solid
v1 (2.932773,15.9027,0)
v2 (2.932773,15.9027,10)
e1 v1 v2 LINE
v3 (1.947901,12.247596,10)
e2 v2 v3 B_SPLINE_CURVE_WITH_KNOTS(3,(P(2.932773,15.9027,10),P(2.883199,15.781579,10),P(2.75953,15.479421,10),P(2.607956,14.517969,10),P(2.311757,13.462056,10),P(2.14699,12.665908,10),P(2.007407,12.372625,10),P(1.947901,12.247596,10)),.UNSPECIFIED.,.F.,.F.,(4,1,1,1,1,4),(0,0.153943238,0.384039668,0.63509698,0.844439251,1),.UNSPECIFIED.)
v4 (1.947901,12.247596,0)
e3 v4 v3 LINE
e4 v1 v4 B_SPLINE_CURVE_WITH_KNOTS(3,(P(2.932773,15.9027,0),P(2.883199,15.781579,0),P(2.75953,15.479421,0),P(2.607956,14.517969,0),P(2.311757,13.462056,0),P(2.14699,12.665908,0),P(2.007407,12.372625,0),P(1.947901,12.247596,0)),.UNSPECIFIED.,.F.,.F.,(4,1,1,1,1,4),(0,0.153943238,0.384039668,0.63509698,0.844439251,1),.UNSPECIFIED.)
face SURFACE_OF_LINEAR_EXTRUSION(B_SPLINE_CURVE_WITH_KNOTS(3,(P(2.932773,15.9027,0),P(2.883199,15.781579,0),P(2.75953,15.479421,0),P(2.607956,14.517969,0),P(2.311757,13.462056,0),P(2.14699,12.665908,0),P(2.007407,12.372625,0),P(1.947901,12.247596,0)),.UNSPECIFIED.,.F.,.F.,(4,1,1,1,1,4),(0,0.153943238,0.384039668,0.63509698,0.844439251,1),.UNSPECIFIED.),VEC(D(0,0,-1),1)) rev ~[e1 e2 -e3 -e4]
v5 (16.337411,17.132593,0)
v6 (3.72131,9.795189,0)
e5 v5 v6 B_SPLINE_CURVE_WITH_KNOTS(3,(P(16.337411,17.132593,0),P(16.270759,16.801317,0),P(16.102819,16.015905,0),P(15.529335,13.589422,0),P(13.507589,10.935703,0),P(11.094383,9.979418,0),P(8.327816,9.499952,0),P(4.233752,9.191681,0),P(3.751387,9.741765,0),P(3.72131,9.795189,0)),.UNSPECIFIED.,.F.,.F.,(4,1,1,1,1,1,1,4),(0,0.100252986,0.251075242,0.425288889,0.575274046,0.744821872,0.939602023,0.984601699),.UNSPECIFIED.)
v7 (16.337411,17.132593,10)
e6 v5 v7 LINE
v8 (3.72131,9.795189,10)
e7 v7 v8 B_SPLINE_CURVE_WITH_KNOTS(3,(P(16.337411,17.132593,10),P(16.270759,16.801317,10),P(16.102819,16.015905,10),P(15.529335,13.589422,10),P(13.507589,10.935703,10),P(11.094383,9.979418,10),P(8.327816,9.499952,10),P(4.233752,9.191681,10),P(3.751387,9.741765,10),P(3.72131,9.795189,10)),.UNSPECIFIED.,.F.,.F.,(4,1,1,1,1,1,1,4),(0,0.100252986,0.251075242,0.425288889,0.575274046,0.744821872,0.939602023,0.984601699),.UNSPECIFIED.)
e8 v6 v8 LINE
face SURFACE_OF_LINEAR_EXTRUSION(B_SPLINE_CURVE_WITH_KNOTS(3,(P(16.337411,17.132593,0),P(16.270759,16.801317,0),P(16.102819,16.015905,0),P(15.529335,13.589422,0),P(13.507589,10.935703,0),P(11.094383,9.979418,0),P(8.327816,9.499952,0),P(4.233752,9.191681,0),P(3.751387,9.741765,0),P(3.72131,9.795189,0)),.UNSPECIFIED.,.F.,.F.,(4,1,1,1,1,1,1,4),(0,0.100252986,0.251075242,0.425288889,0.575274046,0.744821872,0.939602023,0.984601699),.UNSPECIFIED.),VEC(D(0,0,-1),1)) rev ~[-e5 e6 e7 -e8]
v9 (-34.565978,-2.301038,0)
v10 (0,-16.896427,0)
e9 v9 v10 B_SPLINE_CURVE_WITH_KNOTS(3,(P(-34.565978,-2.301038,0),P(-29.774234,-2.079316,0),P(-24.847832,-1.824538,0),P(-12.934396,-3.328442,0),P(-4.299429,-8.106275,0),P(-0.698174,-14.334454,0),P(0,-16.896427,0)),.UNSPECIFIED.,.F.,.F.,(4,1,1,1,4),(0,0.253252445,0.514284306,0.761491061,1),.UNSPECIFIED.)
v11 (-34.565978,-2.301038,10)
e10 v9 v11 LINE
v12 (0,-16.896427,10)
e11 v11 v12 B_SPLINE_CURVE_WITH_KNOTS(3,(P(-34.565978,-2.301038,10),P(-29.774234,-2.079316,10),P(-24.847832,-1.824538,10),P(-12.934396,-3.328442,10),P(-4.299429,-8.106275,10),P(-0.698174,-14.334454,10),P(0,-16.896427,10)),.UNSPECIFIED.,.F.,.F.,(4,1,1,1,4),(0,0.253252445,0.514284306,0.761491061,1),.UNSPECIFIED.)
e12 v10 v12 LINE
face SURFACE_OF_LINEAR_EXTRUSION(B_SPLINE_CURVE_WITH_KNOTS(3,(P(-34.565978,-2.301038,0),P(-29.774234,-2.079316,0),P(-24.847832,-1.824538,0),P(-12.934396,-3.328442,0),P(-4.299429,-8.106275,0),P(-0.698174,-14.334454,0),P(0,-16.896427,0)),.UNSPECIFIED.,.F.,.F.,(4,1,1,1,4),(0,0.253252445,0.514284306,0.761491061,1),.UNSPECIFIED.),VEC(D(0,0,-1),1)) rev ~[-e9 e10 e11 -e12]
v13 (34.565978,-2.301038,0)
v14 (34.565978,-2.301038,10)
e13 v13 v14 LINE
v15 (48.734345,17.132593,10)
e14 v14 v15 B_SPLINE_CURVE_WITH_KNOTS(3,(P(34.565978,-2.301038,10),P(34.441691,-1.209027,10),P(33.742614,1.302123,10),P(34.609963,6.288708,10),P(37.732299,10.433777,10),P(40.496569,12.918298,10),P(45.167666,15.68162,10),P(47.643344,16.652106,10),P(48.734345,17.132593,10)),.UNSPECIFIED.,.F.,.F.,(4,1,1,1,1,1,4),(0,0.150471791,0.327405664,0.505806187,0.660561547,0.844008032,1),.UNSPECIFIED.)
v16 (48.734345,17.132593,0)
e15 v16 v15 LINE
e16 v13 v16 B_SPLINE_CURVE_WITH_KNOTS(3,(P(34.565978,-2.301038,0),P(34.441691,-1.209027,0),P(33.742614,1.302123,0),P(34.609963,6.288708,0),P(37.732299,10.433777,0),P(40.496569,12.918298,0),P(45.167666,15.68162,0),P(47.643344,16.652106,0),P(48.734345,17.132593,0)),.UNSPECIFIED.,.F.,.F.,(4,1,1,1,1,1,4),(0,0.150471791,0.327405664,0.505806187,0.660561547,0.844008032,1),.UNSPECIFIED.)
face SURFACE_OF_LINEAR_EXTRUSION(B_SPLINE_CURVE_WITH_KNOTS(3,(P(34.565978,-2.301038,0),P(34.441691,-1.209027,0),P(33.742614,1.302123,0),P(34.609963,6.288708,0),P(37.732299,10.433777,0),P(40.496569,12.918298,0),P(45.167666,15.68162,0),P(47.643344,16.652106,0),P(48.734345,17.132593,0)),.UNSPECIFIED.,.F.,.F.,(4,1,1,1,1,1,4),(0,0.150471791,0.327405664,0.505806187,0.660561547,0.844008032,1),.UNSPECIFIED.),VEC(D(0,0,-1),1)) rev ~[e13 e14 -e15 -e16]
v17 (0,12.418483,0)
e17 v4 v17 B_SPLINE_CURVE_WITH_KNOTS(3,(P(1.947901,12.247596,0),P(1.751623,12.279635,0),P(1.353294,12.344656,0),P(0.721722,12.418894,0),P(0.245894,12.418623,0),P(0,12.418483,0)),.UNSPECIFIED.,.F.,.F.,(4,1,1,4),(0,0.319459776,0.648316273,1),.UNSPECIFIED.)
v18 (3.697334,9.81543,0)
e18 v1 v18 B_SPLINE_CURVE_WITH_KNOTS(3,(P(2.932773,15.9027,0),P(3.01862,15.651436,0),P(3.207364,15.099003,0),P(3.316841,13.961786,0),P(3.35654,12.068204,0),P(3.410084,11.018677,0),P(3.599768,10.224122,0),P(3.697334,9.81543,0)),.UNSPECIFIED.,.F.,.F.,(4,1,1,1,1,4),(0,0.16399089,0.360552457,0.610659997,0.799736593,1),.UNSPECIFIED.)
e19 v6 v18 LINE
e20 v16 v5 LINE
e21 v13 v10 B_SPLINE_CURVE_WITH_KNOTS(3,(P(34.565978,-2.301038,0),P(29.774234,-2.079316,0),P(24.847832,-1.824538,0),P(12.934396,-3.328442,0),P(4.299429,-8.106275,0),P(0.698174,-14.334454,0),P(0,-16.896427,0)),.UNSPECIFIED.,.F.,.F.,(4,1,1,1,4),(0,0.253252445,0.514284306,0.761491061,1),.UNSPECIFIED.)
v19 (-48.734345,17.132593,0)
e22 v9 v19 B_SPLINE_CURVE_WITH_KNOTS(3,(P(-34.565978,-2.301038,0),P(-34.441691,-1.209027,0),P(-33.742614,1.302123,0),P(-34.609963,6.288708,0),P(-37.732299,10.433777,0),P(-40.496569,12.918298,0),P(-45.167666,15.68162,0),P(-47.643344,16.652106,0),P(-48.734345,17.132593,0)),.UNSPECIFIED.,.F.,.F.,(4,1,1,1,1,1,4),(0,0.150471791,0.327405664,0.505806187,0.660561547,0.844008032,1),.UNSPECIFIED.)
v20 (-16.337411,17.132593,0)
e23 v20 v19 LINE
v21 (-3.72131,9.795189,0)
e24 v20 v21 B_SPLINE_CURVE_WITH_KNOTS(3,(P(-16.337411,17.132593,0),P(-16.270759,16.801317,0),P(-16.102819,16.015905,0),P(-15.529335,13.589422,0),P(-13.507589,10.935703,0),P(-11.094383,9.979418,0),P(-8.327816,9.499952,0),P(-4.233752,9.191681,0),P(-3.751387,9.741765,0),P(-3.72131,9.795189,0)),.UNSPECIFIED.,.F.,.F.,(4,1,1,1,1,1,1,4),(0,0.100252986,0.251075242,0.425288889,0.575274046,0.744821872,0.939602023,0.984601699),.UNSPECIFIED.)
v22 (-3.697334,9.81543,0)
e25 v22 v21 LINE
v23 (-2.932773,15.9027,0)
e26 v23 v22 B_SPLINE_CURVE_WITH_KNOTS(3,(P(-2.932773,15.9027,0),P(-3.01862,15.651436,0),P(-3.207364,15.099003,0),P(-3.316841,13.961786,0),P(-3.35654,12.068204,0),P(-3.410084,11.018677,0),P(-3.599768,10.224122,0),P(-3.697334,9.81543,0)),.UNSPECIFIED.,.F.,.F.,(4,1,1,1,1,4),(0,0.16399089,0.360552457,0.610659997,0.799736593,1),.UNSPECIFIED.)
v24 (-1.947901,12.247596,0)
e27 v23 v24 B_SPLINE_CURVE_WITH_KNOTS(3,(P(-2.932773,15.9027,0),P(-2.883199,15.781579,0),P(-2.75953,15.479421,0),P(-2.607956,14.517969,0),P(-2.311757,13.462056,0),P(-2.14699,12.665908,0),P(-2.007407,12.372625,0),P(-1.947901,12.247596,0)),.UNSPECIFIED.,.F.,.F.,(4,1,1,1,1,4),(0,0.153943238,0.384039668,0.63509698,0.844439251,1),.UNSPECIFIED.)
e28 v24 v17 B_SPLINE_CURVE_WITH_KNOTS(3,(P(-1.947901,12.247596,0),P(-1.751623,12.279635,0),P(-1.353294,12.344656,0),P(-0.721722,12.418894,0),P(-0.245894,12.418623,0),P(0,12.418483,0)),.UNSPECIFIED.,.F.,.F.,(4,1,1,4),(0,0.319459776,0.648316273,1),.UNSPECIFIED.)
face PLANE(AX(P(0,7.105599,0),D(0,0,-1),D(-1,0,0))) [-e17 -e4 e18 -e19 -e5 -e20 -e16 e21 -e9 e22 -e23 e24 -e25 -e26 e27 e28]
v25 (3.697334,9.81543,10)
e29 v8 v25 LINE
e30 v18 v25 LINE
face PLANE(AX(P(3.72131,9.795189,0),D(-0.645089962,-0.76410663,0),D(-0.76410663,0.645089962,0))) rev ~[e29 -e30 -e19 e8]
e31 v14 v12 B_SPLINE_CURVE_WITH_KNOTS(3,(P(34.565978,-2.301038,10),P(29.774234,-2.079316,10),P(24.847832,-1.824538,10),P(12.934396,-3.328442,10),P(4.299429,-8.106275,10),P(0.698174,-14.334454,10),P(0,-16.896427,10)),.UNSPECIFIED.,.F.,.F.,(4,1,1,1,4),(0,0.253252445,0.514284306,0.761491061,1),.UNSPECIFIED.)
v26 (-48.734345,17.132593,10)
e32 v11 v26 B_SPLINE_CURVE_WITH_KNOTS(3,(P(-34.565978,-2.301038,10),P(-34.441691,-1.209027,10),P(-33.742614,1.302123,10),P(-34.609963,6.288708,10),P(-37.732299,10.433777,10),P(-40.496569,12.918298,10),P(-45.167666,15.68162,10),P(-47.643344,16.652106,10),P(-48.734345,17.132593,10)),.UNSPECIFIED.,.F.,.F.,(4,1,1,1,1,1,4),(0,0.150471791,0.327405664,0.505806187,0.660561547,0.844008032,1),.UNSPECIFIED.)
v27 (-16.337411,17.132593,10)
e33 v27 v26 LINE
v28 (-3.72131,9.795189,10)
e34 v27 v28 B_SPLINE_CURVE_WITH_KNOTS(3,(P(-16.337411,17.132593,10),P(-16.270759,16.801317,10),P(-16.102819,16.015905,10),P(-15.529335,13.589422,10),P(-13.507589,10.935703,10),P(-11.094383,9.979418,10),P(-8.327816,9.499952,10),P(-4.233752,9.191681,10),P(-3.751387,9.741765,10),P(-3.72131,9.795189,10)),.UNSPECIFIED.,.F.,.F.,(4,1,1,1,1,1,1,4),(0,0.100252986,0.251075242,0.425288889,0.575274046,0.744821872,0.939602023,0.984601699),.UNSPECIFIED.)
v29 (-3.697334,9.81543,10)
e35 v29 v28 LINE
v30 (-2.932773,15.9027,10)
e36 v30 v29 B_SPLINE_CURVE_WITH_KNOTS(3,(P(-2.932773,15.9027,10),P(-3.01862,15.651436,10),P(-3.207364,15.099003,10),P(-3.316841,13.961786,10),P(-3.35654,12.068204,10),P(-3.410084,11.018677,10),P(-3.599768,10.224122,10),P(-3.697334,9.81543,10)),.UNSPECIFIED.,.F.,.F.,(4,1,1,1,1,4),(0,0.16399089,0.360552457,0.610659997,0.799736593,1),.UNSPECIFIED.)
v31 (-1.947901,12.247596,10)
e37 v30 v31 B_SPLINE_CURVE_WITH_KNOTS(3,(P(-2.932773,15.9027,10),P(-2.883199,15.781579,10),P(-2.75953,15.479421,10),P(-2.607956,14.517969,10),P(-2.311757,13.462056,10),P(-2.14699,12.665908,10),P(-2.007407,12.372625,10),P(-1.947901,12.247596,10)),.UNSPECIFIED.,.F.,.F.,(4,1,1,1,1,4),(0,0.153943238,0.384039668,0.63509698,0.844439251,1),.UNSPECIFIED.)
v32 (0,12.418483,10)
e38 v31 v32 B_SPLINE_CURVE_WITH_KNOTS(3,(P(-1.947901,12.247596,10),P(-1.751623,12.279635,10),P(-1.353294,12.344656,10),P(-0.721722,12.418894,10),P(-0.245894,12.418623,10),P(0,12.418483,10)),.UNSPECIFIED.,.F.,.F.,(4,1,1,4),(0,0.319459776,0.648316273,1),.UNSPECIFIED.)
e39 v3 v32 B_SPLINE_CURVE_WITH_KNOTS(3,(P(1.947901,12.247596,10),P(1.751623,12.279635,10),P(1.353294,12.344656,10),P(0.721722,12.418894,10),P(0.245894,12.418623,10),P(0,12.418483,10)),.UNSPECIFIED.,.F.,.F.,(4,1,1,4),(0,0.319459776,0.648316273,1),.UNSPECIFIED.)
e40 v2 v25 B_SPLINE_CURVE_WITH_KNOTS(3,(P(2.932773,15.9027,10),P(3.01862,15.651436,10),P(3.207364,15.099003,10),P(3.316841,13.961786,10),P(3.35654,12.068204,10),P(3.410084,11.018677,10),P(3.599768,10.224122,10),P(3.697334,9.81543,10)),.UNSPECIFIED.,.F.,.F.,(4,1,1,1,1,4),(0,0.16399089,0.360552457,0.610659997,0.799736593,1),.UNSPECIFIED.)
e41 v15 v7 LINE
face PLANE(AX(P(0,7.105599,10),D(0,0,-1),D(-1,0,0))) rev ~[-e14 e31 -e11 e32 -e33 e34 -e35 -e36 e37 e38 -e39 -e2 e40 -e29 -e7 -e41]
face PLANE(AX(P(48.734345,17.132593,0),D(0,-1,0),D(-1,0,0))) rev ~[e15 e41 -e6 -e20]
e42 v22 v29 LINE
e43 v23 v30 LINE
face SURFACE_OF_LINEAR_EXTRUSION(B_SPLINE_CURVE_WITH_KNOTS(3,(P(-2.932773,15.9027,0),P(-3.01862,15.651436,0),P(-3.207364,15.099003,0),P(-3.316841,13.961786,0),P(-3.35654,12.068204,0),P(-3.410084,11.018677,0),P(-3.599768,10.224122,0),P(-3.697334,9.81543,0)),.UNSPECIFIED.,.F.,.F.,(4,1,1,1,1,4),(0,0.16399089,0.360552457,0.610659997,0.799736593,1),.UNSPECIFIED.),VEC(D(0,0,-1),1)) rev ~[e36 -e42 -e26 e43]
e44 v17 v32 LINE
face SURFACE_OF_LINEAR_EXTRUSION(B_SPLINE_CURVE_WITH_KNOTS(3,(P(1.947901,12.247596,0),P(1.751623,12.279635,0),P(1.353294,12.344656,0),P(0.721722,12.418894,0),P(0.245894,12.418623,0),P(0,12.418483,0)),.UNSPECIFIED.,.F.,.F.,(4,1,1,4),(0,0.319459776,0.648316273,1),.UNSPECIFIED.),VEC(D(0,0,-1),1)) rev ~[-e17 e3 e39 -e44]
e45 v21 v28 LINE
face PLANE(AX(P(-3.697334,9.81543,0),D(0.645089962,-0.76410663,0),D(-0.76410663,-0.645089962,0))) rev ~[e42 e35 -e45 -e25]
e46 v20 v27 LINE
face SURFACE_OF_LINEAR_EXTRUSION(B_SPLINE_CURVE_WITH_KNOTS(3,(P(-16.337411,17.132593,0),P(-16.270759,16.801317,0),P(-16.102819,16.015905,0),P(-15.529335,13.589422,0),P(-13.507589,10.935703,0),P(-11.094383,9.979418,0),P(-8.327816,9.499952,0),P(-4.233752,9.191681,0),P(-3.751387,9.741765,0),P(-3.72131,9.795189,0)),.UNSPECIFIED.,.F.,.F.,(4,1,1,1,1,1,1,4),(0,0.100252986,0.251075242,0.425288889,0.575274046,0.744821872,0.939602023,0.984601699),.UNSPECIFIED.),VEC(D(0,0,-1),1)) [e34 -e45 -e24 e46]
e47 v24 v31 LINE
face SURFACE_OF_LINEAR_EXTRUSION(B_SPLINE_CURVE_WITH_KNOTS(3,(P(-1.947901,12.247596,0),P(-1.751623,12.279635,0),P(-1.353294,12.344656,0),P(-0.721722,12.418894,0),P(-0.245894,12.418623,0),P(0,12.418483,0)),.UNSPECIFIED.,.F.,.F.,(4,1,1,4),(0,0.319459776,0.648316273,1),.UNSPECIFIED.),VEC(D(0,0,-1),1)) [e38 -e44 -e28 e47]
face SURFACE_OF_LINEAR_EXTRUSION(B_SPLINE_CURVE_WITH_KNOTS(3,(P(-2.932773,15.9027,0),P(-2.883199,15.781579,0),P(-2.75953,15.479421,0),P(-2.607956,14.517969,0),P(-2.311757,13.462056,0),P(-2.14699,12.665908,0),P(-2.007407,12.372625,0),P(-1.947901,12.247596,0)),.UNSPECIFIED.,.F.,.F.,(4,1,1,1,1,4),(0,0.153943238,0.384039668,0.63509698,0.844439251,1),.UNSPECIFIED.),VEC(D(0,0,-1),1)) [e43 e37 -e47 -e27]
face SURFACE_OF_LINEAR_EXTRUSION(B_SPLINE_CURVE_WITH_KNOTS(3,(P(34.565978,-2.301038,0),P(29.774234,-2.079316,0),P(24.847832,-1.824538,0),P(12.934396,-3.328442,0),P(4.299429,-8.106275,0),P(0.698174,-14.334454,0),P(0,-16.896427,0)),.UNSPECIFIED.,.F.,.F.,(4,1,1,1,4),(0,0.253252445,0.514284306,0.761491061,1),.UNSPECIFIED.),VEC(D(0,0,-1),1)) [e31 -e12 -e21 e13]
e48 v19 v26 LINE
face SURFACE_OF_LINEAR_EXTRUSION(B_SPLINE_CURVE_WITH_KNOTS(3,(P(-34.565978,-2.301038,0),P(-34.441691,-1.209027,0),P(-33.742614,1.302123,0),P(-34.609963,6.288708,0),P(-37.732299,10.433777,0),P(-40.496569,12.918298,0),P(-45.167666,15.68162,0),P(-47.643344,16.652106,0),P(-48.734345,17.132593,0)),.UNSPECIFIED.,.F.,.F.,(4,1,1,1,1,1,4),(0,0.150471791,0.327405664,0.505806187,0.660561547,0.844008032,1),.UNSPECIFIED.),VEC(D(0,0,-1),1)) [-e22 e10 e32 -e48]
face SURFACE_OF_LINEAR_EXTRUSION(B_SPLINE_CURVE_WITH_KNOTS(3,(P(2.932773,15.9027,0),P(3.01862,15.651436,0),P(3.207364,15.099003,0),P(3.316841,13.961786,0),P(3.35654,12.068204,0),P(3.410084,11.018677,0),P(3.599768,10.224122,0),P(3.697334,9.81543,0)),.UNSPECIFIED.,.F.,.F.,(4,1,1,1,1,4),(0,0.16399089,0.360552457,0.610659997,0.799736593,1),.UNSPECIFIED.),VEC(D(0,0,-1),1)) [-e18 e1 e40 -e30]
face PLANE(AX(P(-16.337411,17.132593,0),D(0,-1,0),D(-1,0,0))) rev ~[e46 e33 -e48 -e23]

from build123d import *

# Parameters (mm, degrees)
F1_DEPTH = 10


with BuildPart() as f1:
    # F0 (on Top) → F1 (new body)
    with BuildSketch(Plane.XY):
        with BuildLine():
            add(Edge.make_bspline(
                [(-34.5659777522, -2.3010377772), (-34.441690892, -1.2090269011), (-33.7426143908, 1.3021229087), (-34.6099625003, 6.2887083902), (-37.732299485, 10.4337765544), (-40.4965689238, 12.9182984992), (-45.1676660532, 15.6816198367), (-47.6433440327, 16.6521064837), (-48.734344542, 17.1325933188)],
                knots=[0, 0, 0, 0, 0.1504717907, 0.3274056637, 0.505806187, 0.6605615473, 0.844008032, 1, 1, 1, 1], degree=3))
            add(Edge.make_bspline(
                [(-34.5659777522, -2.3010377772), (-29.7742336988, -2.0793164149), (-24.8478324902, -1.8245382393), (-12.9343956026, -3.3284422394), (-4.2994288291, -8.106275212), (-0.6981744502, -14.3344540986), (0, -16.8964266777)],
                knots=[0, 0, 0, 0, 0.2532524451, 0.514284306, 0.7614910609, 1, 1, 1, 1], degree=3))
            add(Edge.make_bspline(
                [(34.5659777522, -2.3010377772), (29.7742336988, -2.0793164149), (24.8478324902, -1.8245382393), (12.9343956026, -3.3284422394), (4.2994288291, -8.106275212), (0.6981744502, -14.3344540986), (0, -16.8964266777)],
                knots=[0, 0, 0, 0, 0.2532524451, 0.514284306, 0.7614910609, 1, 1, 1, 1], degree=3))
            add(Edge.make_bspline(
                [(34.5659777522, -2.3010377772), (34.441690892, -1.2090269011), (33.7426143908, 1.3021229087), (34.6099625003, 6.2887083902), (37.732299485, 10.4337765544), (40.4965689238, 12.9182984992), (45.1676660532, 15.6816198367), (47.6433440327, 16.6521064837), (48.734344542, 17.1325933188)],
                knots=[0, 0, 0, 0, 0.1504717907, 0.3274056637, 0.505806187, 0.6605615473, 0.844008032, 1, 1, 1, 1], degree=3))
            Line((48.734344542, 17.1325933188), (16.3374114782, 17.1325933188))
            add(Edge.make_bspline(
                [(16.3374114782, 17.1325933188), (16.2707590578, 16.8013167715), (16.1028193617, 16.0159047713), (15.5293351039, 13.5894216644), (13.5075885145, 10.9357028955), (11.0943832685, 9.979418199), (8.3278162532, 9.4999515323), (4.2337515187, 9.1916813282), (3.7513867907, 9.7417653506), (3.721309654, 9.7951889602)],
                knots=[0, 0, 0, 0, 0.1002529863, 0.2510752424, 0.4252888894, 0.575274046, 0.7448218724, 0.9396020225, 0.9846016995, 0.9846016995, 0.9846016995, 0.9846016995], degree=3))
            Line((3.721309654, 9.7951889602), (3.6973344953, 9.8154297664))
            add(Edge.make_bspline(
                [(2.932772506, 15.9026999027), (3.018619719, 15.6514358008), (3.2073644933, 15.0990033508), (3.3168408961, 13.9617858734), (3.3565401619, 12.068204215), (3.4100837285, 11.0186767215), (3.599767527, 10.2241220004), (3.6973344953, 9.8154297664)],
                knots=[0, 0, 0, 0, 0.16399089, 0.3605524565, 0.6106599974, 0.7997365931, 1, 1, 1, 1], degree=3))
            add(Edge.make_bspline(
                [(2.932772506, 15.9026999027), (2.8831992541, 15.7815790305), (2.7595296769, 15.4794207803), (2.6079557623, 14.5179694226), (2.311756701, 13.4620564486), (2.1469901884, 12.6659080553), (2.0074066607, 12.3726247092), (1.9479012117, 12.2475959361)],
                knots=[0, 0, 0, 0, 0.1539432383, 0.3840396681, 0.6350969803, 0.8444392514, 1, 1, 1, 1], degree=3))
            add(Edge.make_bspline(
                [(1.9479012117, 12.2475959361), (1.7516233528, 12.2796352379), (1.3532942381, 12.3446562585), (0.7217223004, 12.418893829), (0.2458943028, 12.4186232246), (0, 12.418483384)],
                knots=[0, 0, 0, 0, 0.3194597762, 0.6483162725, 1, 1, 1, 1], degree=3))
            add(Edge.make_bspline(
                [(-1.9479012117, 12.2475959361), (-1.7516233528, 12.2796352379), (-1.3532942381, 12.3446562585), (-0.7217223004, 12.418893829), (-0.2458943028, 12.4186232246), (0, 12.418483384)],
                knots=[0, 0, 0, 0, 0.3194597762, 0.6483162725, 1, 1, 1, 1], degree=3))
            add(Edge.make_bspline(
                [(-2.932772506, 15.9026999027), (-2.8831992541, 15.7815790305), (-2.7595296769, 15.4794207803), (-2.6079557623, 14.5179694226), (-2.311756701, 13.4620564486), (-2.1469901884, 12.6659080553), (-2.0074066607, 12.3726247092), (-1.9479012117, 12.2475959361)],
                knots=[0, 0, 0, 0, 0.1539432383, 0.3840396681, 0.6350969803, 0.8444392514, 1, 1, 1, 1], degree=3))
            add(Edge.make_bspline(
                [(-2.932772506, 15.9026999027), (-3.018619719, 15.6514358008), (-3.2073644933, 15.0990033508), (-3.3168408961, 13.9617858734), (-3.3565401619, 12.068204215), (-3.4100837285, 11.0186767215), (-3.599767527, 10.2241220004), (-3.6973344953, 9.8154297664)],
                knots=[0, 0, 0, 0, 0.16399089, 0.3605524565, 0.6106599974, 0.7997365931, 1, 1, 1, 1], degree=3))
            Line((-3.6973344953, 9.8154297664), (-3.721309654, 9.7951889602))
            add(Edge.make_bspline(
                [(-16.3374114782, 17.1325933188), (-16.2707590578, 16.8013167715), (-16.1028193617, 16.0159047713), (-15.5293351039, 13.5894216644), (-13.5075885145, 10.9357028955), (-11.0943832685, 9.979418199), (-8.3278162532, 9.4999515323), (-4.2337515187, 9.1916813282), (-3.7513867907, 9.7417653506), (-3.721309654, 9.7951889602)],
                knots=[0, 0, 0, 0, 0.1002529863, 0.2510752424, 0.4252888894, 0.575274046, 0.7448218724, 0.9396020225, 0.9846016995, 0.9846016995, 0.9846016995, 0.9846016995], degree=3))
            Line((-16.3374114782, 17.1325933188), (-48.734344542, 17.1325933188))
        make_face()
    extrude(amount=F1_DEPTH)


solid = f1.part
